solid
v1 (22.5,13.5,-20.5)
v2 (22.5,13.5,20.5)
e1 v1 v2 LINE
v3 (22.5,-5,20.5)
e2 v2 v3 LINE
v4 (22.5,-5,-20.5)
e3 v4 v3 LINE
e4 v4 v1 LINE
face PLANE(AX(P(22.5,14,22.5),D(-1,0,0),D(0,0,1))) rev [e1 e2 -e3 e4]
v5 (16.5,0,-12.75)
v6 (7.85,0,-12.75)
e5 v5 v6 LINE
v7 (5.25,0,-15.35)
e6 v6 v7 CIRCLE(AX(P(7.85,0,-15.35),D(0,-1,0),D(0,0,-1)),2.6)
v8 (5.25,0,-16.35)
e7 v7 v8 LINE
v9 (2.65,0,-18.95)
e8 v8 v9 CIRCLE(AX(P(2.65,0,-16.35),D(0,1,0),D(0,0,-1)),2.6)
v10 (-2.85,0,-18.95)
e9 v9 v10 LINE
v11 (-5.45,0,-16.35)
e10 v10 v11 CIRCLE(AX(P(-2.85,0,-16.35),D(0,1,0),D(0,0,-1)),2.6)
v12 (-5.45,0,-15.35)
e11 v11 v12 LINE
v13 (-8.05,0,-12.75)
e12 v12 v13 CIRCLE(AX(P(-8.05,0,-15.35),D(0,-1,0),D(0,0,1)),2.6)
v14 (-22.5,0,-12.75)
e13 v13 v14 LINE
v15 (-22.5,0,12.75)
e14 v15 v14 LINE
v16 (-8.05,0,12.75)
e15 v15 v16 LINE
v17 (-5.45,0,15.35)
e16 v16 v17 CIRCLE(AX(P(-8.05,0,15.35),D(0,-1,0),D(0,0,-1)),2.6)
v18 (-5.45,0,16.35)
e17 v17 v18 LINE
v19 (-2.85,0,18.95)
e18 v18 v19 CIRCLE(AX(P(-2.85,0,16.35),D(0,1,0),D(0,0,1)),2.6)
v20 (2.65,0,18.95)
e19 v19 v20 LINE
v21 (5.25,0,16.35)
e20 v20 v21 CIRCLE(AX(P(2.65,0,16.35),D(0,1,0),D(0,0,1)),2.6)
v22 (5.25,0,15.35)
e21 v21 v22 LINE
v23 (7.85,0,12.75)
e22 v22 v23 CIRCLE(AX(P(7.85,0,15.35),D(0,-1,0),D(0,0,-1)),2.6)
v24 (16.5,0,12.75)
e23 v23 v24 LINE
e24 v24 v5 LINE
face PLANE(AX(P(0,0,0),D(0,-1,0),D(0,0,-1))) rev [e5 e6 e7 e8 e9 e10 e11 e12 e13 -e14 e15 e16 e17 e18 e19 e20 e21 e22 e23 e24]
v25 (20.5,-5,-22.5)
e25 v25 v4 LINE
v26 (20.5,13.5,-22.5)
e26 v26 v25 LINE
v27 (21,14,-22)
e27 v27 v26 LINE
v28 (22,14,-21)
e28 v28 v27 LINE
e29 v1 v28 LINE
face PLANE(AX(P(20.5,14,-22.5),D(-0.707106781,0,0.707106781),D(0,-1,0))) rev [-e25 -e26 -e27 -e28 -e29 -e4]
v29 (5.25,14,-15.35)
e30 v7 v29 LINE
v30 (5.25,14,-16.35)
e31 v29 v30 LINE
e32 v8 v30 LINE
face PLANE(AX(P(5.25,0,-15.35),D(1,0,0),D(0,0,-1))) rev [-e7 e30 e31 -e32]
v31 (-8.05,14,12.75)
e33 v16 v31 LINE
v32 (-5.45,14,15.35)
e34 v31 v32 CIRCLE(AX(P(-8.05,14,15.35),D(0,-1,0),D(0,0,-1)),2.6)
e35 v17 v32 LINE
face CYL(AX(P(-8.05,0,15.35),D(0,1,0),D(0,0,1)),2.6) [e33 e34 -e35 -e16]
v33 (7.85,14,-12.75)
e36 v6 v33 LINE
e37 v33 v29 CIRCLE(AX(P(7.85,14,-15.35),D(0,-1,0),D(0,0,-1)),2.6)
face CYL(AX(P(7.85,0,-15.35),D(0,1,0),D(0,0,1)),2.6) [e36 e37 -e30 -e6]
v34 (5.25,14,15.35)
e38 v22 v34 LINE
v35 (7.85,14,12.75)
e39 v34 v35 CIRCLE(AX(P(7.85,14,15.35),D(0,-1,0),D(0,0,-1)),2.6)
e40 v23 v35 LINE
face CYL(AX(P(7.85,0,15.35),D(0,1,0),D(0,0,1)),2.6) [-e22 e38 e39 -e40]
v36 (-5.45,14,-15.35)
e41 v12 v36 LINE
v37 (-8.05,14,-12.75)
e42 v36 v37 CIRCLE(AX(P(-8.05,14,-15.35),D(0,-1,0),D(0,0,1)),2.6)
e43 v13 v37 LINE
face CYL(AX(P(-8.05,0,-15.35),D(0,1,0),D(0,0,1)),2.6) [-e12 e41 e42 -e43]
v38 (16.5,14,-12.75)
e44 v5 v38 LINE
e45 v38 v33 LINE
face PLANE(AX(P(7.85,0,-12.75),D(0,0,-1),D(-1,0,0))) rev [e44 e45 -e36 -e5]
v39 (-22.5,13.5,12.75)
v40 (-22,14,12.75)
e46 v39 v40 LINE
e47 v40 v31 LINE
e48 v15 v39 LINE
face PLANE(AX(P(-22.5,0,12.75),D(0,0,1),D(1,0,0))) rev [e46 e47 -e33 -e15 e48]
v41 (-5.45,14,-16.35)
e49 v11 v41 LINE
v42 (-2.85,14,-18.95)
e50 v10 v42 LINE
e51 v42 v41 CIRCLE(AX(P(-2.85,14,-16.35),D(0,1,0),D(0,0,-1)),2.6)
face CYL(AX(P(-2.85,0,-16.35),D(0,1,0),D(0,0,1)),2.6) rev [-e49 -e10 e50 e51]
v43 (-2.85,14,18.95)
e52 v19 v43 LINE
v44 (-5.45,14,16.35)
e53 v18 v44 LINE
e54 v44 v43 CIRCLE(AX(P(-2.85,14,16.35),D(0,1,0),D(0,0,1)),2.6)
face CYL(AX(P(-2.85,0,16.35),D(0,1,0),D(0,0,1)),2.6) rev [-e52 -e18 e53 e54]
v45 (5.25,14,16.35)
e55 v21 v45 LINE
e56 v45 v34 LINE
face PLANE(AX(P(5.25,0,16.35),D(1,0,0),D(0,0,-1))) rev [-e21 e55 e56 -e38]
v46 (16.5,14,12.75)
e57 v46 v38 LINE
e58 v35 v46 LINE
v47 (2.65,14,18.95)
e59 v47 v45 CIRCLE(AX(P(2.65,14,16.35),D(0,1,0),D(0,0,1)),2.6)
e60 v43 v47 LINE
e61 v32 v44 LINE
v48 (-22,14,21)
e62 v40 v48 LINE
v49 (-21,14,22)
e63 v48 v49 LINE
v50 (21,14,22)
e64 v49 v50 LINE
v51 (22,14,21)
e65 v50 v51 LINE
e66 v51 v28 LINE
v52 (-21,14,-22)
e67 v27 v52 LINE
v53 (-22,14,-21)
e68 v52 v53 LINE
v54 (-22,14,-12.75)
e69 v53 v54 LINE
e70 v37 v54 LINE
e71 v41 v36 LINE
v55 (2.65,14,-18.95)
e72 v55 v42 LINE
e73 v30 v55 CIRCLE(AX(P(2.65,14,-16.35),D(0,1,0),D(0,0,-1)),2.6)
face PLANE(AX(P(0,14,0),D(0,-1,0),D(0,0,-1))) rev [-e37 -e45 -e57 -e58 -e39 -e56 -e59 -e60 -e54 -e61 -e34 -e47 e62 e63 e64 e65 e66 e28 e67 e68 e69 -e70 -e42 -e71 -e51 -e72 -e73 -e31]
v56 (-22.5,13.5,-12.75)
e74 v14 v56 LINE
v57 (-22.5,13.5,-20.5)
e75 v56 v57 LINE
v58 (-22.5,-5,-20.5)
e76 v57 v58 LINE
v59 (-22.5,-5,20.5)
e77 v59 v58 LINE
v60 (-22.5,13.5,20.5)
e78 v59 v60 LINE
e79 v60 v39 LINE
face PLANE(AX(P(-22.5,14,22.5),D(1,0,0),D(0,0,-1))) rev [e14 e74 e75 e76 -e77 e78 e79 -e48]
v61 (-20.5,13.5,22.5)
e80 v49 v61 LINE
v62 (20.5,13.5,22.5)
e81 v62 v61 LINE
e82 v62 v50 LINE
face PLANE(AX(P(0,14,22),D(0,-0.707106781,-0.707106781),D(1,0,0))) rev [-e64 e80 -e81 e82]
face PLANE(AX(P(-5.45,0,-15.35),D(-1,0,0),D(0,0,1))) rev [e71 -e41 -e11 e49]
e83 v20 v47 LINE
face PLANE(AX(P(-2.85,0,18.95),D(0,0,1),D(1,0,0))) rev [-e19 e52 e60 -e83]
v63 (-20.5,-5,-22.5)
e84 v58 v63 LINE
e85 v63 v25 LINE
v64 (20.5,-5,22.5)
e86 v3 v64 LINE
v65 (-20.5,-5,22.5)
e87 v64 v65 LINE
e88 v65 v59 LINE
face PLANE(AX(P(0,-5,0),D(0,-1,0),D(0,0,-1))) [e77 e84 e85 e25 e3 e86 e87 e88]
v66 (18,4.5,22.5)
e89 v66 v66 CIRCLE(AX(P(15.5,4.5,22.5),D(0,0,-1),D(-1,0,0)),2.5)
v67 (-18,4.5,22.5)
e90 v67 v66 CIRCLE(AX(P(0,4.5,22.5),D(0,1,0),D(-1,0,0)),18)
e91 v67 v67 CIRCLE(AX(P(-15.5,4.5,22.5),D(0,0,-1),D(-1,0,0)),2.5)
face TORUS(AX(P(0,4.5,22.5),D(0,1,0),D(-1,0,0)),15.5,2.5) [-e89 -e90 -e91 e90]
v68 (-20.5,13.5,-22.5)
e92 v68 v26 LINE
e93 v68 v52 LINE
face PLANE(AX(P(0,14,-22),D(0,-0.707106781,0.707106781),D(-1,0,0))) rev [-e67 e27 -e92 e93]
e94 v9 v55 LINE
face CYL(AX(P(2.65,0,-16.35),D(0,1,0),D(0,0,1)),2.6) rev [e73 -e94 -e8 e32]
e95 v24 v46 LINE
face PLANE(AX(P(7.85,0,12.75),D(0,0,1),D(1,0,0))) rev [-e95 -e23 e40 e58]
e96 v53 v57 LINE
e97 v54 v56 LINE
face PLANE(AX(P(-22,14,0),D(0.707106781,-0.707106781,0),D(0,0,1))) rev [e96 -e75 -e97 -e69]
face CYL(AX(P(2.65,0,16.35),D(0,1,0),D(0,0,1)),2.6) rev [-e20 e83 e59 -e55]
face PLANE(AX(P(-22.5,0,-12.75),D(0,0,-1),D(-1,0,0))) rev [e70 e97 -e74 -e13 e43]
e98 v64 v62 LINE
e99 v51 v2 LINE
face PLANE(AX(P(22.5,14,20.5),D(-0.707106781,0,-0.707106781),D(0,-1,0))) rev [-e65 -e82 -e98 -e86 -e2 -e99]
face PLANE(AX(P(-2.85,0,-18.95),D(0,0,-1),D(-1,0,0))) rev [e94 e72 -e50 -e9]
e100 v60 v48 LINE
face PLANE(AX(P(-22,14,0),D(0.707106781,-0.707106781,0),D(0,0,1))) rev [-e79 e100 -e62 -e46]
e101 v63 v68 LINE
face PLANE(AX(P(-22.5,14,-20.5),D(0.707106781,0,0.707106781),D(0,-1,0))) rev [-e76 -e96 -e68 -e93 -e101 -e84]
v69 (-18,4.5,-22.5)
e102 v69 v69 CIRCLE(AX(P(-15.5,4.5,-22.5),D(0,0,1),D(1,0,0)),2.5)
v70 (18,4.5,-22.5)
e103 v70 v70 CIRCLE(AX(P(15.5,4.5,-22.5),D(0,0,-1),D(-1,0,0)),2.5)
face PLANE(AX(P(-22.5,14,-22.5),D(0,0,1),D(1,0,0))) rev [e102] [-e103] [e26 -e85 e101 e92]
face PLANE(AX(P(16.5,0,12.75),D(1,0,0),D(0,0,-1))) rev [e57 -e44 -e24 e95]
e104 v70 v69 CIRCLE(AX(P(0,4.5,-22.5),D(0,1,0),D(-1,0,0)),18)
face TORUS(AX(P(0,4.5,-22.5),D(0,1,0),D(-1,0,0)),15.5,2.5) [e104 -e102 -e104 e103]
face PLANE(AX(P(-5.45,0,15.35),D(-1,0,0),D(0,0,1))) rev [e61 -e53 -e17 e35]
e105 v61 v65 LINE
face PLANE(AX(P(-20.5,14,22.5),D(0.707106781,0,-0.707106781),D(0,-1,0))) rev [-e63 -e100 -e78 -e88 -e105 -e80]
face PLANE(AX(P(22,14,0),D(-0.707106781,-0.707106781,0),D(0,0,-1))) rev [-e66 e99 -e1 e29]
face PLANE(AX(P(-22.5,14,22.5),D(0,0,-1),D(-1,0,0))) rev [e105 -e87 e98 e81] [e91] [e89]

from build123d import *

# Parameters (mm, degrees)
SKETCH1_W           = 45
SKETCH1_H           = 45
BOSS_EXTRUDE1_DEPTH = 14
CUT_EXTRUDE1_DEPTH  = 35.763486592
CHAMFER1_SIZE       = 0.5
CHAMFER2_SIZE       = 2
SKETCH4_R           = 1.75
CUT_EXTRUDE2_DEPTH  = 35.763486592
SKETCH5_R           = 1.75
SKETCH5_W           = 41
SKETCH5_H           = 2
SKETCH5_W_2         = 2
SKETCH5_H_2         = 41
BOSS_EXTRUDE3_DEPTH = 5
SKETCH6_R           = 1.75
BOSS_EXTRUDE4_DEPTH = 19
REVOLVE4_OUTLINE_R  = 2.5
REVOLVE4_ANGLE      = 180


# Read off the part's stored shape, not the designer's step: Revolve4
with BuildPart() as part:
    # Sketch1 → Boss-Extrude1 (new body)
    with BuildSketch(Plane(origin=(0, 0, 0), x_dir=(1, 0, 0), z_dir=(0, 1, 0))):
        Rectangle(SKETCH1_W, SKETCH1_H)
    extrude(amount=BOSS_EXTRUDE1_DEPTH)

    # Sketch3 → Cut-Extrude1 (cut, through all)
    with BuildSketch(Plane(origin=(0, 14, 0), x_dir=(1, 0, 0), z_dir=(0, 1, 0))):
        with BuildLine():
            Line((-22.5, 12.75), (-8.05, 12.75))
            ThreePointArc((-8.05, 12.75), (-6.211522369, 13.511522369), (-5.45, 15.35))
            Line((-5.45, 15.35), (-5.45, 16.35))
            ThreePointArc((-5.45, 16.35), (-4.688477631, 18.188477631), (-2.85, 18.95))
            Line((-2.85, 18.95), (2.65, 18.95))
            ThreePointArc((2.65, 18.95), (4.488477631, 18.188477631), (5.25, 16.35))
            Line((5.25, 16.35), (5.25, 15.35))
            ThreePointArc((5.25, 15.35), (6.011522369, 13.511522369), (7.85, 12.75))
            Line((7.85, 12.75), (16.5, 12.75))
            Line((16.5, 12.75), (16.5, -12.75))
            Line((16.5, -12.75), (7.85, -12.75))
            ThreePointArc((7.85, -12.75), (6.011522369, -13.511522369), (5.25, -15.35))
            Line((5.25, -15.35), (5.25, -16.35))
            ThreePointArc((5.25, -16.35), (4.488477631, -18.188477631), (2.65, -18.95))
            Line((2.65, -18.95), (-2.85, -18.95))
            ThreePointArc((-2.85, -18.95), (-4.688477631, -18.188477631), (-5.45, -16.35))
            Line((-5.45, -16.35), (-5.45, -15.35))
            ThreePointArc((-5.45, -15.35), (-6.211522369, -13.511522369), (-8.05, -12.75))
            Line((-8.05, -12.75), (-22.5, -12.75))
            Line((-22.5, -12.75), (-22.5, 12.75))
        make_face()
    extrude(amount=-CUT_EXTRUDE1_DEPTH, mode=Mode.SUBTRACT)

    # Chamfer1
    chamfer1_edges = [part.edges().sort_by_distance(p)[0] for p in [
        (-22.5, 14, -17.625),
        (0, 14, 22.5),
        (-22.5, 14, 17.625),
        (22.5, 14, 0),
        (0, 14, -22.5),
    ]]
    chamfer(chamfer1_edges, length=CHAMFER1_SIZE)

    # Chamfer2
    # the kernel refuses this chamfer: 5.464101615, 2 mm, written as the material it takes off along each edge
    # the kernel refuses this chamfer: 5.464101615, 2 mm, written as the material it takes off along each edge
    with BuildSketch(Plane(origin=(-22.5, -5.143365976, -22.5), x_dir=(-0.027495876610585647, 0, 0.9996219169112968), z_dir=(0, 1, 0)), Plane(origin=(-22.5, -5.143365976, 22.5), x_dir=(0.9996219169112968, 0, 0.027495876610585647), z_dir=(0, 1, 0))) as chamfer2_2_piece_1:
        Polygon((CHAMFER2_SIZE * 0.999621916911, CHAMFER2_SIZE * 0.0274958766106), (-CHAMFER2_SIZE * 0.0274958766106, CHAMFER2_SIZE * 0.999621916911), (0, 0), align=None)
    extrude(amount=23.786731952, mode=Mode.SUBTRACT)
    with BuildSketch(Plane(origin=(22.5, -5.143365976, 22.5), x_dir=(-0.9996219169112968, 0, 0.027495876610585647), z_dir=(0, 1, 0)), Plane(origin=(22.5, -5.143365976, -22.5), x_dir=(0.027495876610585647, 0, 0.9996219169112968), z_dir=(0, 1, 0))) as chamfer2_2_piece_2:
        Polygon((CHAMFER2_SIZE * 0.999621916911, -CHAMFER2_SIZE * 0.0274958766106), (-CHAMFER2_SIZE * 0.0274958766106, -CHAMFER2_SIZE * 0.999621916911), (0, 0), align=None)
    extrude(amount=23.786731952, mode=Mode.SUBTRACT)

    # Sketch4 → Cut-Extrude2 (cut, through all)
    with BuildSketch(Plane(origin=(0, 14, 0), x_dir=(1, 0, 0), z_dir=(0, 1, 0))):
        with Locations(Location((-18, 17.25, 0), (0, 0, 270))):
            Circle(SKETCH4_R)
        with Locations(Location((18, 17.25, 0), (0, 0, 270))):
            Circle(SKETCH4_R)
        with Locations(Location((18, -17.25, 0), (0, 0, 270))):
            Circle(SKETCH4_R)
        with Locations(Location((-18, -17.25, 0), (0, 0, 270))):
            Circle(SKETCH4_R)
    extrude(amount=-CUT_EXTRUDE2_DEPTH, mode=Mode.SUBTRACT)

    # Sketch5 → Boss-Extrude3 (add)
    # profile 1 of 7: a face of its own
    with BuildSketch(Plane.XZ):
        with BuildLine():
            Line((20.5, 20.5), (20.5, -22.5))
            Line((20.5, -22.5), (-20.5, -22.5))
            Line((-20.5, -22.5), (-22.5, -20.5))
            Line((-22.5, -20.5), (-22.5, -12.75))
            Line((-22.5, -12.75), (-8.05, -12.75))
            ThreePointArc((-8.05, -12.75), (-6.211522369, -13.511522369), (-5.45, -15.35))
            Line((-5.45, -15.35), (-5.45, -16.35))
            ThreePointArc((-5.45, -16.35), (-4.688477631, -18.188477631), (-2.85, -18.95))
            Line((-2.85, -18.95), (2.65, -18.95))
            ThreePointArc((2.65, -18.95), (4.488477631, -18.188477631), (5.25, -16.35))
            Line((5.25, -16.35), (5.25, -15.35))
            ThreePointArc((5.25, -15.35), (6.011522369, -13.511522369), (7.85, -12.75))
            Line((7.85, -12.75), (16.5, -12.75))
            Line((16.5, -12.75), (16.5, 12.75))
            Line((16.5, 12.75), (7.85, 12.75))
            ThreePointArc((7.85, 12.75), (6.011522369, 13.511522369), (5.25, 15.35))
            Line((5.25, 15.35), (5.25, 16.35))
            ThreePointArc((5.25, 16.35), (4.488477631, 18.188477631), (2.65, 18.95))
            Line((2.65, 18.95), (-2.85, 18.95))
            ThreePointArc((-2.85, 18.95), (-4.688477631, 18.188477631), (-5.45, 16.35))
            Line((-5.45, 16.35), (-5.45, 15.35))
            ThreePointArc((-5.45, 15.35), (-6.211522369, 13.511522369), (-8.05, 12.75))
            Line((-8.05, 12.75), (-22.5, 12.75))
            Line((-22.5, 12.75), (-22.5, 20.5))
            Line((-22.5, 20.5), (20.5, 20.5))
        make_face()
        with Locations(Location((18, 17.25, 0), (0, 0, 90))):
            Circle(SKETCH5_R, mode=Mode.SUBTRACT)
        with Locations(Location((-18, -17.25, 0), (0, 0, 90))):
            Circle(SKETCH5_R, mode=Mode.SUBTRACT)
        with Locations(Location((18, -17.25, 0), (0, 0, 90))):
            Circle(SKETCH5_R, mode=Mode.SUBTRACT)
        with Locations(Location((-18, 17.25, 0), (0, 0, 90))):
            Circle(SKETCH5_R, mode=Mode.SUBTRACT)
    # profile 2 of 7: a face of its own
    with BuildSketch(Plane.XZ):
        with Locations((0, 21.5)):
            Rectangle(SKETCH5_W, SKETCH5_H)
    # profile 3 of 7: a face of its own
    with BuildSketch(Plane.XZ):
        Polygon((-22.5, 20.5), (-20.5, 20.5), (-20.5, 22.5), align=None)
    # profile 4 of 7: a face of its own
    with BuildSketch(Plane.XZ):
        Polygon((22.5, 20.5), (20.5, 20.5), (20.5, 22.5), align=None)
    # profile 5 of 7: a face of its own
    with BuildSketch(Plane.XZ):
        with Locations((21.5, 0)):
            Rectangle(SKETCH5_W_2, SKETCH5_H_2)
    # profile 6 of 7: a face of its own
    with BuildSketch(Plane.XZ):
        Polygon((20.5, -20.5), (20.5, -22.5), (22.5, -20.5), align=None)
    # profile 7 of 7: a face of its own
    with BuildSketch(Plane.XZ):
        with BuildLine():
            Line((-22.5, 12.75), (-22.5, -12.75))
            Line((-22.5, -12.75), (-8.05, -12.75))
            ThreePointArc((-8.05, -12.75), (-6.211522369, -13.511522369), (-5.45, -15.35))
            Line((-5.45, -15.35), (-5.45, -16.35))
            ThreePointArc((-5.45, -16.35), (-4.688477631, -18.188477631), (-2.85, -18.95))
            Line((-2.85, -18.95), (2.65, -18.95))
            ThreePointArc((2.65, -18.95), (4.488477631, -18.188477631), (5.25, -16.35))
            Line((5.25, -16.35), (5.25, -15.35))
            ThreePointArc((5.25, -15.35), (6.011522369, -13.511522369), (7.85, -12.75))
            Line((7.85, -12.75), (16.5, -12.75))
            Line((16.5, -12.75), (16.5, 12.75))
            Line((16.5, 12.75), (7.85, 12.75))
            ThreePointArc((7.85, 12.75), (6.011522369, 13.511522369), (5.25, 15.35))
            Line((5.25, 15.35), (5.25, 16.35))
            ThreePointArc((5.25, 16.35), (4.488477631, 18.188477631), (2.65, 18.95))
            Line((2.65, 18.95), (-2.85, 18.95))
            ThreePointArc((-2.85, 18.95), (-4.688477631, 18.188477631), (-5.45, 16.35))
            Line((-5.45, 16.35), (-5.45, 15.35))
            ThreePointArc((-5.45, 15.35), (-6.211522369, 13.511522369), (-8.05, 12.75))
            Line((-8.05, 12.75), (-22.5, 12.75))
        make_face()
    extrude(amount=BOSS_EXTRUDE3_DEPTH)

    # Sketch6 → Boss-Extrude4 (add)
    with BuildSketch(Plane(origin=(0, 14, 0), x_dir=(1, 0, 0), z_dir=(0, 1, 0))):
        with Locations((-18, 17.25)):
            Circle(SKETCH6_R)
        with Locations((18, 17.25)):
            Circle(SKETCH6_R)
        with Locations((-18, -17.25)):
            Circle(SKETCH6_R)
        with Locations((18, -17.25)):
            Circle(SKETCH6_R)
    extrude(amount=-BOSS_EXTRUDE4_DEPTH)

    # Revolve4 outline → Revolve4 (revolve)
    with BuildSketch(Plane(origin=(0, 0, 22.5), x_dir=(-1, 0, 0), z_dir=(0, 0, -1))):
        with Locations((15.5, 4.5)):
            Circle(REVOLVE4_OUTLINE_R)
    revolve4 = revolve(axis=Axis((0, 0, 22.5), (0, 1, 0)), revolution_arc=REVOLVE4_ANGLE)

    # Mirror1: Revolve4 across plane
    add(revolve4.mirror(Plane.XY))


solid = part.part
